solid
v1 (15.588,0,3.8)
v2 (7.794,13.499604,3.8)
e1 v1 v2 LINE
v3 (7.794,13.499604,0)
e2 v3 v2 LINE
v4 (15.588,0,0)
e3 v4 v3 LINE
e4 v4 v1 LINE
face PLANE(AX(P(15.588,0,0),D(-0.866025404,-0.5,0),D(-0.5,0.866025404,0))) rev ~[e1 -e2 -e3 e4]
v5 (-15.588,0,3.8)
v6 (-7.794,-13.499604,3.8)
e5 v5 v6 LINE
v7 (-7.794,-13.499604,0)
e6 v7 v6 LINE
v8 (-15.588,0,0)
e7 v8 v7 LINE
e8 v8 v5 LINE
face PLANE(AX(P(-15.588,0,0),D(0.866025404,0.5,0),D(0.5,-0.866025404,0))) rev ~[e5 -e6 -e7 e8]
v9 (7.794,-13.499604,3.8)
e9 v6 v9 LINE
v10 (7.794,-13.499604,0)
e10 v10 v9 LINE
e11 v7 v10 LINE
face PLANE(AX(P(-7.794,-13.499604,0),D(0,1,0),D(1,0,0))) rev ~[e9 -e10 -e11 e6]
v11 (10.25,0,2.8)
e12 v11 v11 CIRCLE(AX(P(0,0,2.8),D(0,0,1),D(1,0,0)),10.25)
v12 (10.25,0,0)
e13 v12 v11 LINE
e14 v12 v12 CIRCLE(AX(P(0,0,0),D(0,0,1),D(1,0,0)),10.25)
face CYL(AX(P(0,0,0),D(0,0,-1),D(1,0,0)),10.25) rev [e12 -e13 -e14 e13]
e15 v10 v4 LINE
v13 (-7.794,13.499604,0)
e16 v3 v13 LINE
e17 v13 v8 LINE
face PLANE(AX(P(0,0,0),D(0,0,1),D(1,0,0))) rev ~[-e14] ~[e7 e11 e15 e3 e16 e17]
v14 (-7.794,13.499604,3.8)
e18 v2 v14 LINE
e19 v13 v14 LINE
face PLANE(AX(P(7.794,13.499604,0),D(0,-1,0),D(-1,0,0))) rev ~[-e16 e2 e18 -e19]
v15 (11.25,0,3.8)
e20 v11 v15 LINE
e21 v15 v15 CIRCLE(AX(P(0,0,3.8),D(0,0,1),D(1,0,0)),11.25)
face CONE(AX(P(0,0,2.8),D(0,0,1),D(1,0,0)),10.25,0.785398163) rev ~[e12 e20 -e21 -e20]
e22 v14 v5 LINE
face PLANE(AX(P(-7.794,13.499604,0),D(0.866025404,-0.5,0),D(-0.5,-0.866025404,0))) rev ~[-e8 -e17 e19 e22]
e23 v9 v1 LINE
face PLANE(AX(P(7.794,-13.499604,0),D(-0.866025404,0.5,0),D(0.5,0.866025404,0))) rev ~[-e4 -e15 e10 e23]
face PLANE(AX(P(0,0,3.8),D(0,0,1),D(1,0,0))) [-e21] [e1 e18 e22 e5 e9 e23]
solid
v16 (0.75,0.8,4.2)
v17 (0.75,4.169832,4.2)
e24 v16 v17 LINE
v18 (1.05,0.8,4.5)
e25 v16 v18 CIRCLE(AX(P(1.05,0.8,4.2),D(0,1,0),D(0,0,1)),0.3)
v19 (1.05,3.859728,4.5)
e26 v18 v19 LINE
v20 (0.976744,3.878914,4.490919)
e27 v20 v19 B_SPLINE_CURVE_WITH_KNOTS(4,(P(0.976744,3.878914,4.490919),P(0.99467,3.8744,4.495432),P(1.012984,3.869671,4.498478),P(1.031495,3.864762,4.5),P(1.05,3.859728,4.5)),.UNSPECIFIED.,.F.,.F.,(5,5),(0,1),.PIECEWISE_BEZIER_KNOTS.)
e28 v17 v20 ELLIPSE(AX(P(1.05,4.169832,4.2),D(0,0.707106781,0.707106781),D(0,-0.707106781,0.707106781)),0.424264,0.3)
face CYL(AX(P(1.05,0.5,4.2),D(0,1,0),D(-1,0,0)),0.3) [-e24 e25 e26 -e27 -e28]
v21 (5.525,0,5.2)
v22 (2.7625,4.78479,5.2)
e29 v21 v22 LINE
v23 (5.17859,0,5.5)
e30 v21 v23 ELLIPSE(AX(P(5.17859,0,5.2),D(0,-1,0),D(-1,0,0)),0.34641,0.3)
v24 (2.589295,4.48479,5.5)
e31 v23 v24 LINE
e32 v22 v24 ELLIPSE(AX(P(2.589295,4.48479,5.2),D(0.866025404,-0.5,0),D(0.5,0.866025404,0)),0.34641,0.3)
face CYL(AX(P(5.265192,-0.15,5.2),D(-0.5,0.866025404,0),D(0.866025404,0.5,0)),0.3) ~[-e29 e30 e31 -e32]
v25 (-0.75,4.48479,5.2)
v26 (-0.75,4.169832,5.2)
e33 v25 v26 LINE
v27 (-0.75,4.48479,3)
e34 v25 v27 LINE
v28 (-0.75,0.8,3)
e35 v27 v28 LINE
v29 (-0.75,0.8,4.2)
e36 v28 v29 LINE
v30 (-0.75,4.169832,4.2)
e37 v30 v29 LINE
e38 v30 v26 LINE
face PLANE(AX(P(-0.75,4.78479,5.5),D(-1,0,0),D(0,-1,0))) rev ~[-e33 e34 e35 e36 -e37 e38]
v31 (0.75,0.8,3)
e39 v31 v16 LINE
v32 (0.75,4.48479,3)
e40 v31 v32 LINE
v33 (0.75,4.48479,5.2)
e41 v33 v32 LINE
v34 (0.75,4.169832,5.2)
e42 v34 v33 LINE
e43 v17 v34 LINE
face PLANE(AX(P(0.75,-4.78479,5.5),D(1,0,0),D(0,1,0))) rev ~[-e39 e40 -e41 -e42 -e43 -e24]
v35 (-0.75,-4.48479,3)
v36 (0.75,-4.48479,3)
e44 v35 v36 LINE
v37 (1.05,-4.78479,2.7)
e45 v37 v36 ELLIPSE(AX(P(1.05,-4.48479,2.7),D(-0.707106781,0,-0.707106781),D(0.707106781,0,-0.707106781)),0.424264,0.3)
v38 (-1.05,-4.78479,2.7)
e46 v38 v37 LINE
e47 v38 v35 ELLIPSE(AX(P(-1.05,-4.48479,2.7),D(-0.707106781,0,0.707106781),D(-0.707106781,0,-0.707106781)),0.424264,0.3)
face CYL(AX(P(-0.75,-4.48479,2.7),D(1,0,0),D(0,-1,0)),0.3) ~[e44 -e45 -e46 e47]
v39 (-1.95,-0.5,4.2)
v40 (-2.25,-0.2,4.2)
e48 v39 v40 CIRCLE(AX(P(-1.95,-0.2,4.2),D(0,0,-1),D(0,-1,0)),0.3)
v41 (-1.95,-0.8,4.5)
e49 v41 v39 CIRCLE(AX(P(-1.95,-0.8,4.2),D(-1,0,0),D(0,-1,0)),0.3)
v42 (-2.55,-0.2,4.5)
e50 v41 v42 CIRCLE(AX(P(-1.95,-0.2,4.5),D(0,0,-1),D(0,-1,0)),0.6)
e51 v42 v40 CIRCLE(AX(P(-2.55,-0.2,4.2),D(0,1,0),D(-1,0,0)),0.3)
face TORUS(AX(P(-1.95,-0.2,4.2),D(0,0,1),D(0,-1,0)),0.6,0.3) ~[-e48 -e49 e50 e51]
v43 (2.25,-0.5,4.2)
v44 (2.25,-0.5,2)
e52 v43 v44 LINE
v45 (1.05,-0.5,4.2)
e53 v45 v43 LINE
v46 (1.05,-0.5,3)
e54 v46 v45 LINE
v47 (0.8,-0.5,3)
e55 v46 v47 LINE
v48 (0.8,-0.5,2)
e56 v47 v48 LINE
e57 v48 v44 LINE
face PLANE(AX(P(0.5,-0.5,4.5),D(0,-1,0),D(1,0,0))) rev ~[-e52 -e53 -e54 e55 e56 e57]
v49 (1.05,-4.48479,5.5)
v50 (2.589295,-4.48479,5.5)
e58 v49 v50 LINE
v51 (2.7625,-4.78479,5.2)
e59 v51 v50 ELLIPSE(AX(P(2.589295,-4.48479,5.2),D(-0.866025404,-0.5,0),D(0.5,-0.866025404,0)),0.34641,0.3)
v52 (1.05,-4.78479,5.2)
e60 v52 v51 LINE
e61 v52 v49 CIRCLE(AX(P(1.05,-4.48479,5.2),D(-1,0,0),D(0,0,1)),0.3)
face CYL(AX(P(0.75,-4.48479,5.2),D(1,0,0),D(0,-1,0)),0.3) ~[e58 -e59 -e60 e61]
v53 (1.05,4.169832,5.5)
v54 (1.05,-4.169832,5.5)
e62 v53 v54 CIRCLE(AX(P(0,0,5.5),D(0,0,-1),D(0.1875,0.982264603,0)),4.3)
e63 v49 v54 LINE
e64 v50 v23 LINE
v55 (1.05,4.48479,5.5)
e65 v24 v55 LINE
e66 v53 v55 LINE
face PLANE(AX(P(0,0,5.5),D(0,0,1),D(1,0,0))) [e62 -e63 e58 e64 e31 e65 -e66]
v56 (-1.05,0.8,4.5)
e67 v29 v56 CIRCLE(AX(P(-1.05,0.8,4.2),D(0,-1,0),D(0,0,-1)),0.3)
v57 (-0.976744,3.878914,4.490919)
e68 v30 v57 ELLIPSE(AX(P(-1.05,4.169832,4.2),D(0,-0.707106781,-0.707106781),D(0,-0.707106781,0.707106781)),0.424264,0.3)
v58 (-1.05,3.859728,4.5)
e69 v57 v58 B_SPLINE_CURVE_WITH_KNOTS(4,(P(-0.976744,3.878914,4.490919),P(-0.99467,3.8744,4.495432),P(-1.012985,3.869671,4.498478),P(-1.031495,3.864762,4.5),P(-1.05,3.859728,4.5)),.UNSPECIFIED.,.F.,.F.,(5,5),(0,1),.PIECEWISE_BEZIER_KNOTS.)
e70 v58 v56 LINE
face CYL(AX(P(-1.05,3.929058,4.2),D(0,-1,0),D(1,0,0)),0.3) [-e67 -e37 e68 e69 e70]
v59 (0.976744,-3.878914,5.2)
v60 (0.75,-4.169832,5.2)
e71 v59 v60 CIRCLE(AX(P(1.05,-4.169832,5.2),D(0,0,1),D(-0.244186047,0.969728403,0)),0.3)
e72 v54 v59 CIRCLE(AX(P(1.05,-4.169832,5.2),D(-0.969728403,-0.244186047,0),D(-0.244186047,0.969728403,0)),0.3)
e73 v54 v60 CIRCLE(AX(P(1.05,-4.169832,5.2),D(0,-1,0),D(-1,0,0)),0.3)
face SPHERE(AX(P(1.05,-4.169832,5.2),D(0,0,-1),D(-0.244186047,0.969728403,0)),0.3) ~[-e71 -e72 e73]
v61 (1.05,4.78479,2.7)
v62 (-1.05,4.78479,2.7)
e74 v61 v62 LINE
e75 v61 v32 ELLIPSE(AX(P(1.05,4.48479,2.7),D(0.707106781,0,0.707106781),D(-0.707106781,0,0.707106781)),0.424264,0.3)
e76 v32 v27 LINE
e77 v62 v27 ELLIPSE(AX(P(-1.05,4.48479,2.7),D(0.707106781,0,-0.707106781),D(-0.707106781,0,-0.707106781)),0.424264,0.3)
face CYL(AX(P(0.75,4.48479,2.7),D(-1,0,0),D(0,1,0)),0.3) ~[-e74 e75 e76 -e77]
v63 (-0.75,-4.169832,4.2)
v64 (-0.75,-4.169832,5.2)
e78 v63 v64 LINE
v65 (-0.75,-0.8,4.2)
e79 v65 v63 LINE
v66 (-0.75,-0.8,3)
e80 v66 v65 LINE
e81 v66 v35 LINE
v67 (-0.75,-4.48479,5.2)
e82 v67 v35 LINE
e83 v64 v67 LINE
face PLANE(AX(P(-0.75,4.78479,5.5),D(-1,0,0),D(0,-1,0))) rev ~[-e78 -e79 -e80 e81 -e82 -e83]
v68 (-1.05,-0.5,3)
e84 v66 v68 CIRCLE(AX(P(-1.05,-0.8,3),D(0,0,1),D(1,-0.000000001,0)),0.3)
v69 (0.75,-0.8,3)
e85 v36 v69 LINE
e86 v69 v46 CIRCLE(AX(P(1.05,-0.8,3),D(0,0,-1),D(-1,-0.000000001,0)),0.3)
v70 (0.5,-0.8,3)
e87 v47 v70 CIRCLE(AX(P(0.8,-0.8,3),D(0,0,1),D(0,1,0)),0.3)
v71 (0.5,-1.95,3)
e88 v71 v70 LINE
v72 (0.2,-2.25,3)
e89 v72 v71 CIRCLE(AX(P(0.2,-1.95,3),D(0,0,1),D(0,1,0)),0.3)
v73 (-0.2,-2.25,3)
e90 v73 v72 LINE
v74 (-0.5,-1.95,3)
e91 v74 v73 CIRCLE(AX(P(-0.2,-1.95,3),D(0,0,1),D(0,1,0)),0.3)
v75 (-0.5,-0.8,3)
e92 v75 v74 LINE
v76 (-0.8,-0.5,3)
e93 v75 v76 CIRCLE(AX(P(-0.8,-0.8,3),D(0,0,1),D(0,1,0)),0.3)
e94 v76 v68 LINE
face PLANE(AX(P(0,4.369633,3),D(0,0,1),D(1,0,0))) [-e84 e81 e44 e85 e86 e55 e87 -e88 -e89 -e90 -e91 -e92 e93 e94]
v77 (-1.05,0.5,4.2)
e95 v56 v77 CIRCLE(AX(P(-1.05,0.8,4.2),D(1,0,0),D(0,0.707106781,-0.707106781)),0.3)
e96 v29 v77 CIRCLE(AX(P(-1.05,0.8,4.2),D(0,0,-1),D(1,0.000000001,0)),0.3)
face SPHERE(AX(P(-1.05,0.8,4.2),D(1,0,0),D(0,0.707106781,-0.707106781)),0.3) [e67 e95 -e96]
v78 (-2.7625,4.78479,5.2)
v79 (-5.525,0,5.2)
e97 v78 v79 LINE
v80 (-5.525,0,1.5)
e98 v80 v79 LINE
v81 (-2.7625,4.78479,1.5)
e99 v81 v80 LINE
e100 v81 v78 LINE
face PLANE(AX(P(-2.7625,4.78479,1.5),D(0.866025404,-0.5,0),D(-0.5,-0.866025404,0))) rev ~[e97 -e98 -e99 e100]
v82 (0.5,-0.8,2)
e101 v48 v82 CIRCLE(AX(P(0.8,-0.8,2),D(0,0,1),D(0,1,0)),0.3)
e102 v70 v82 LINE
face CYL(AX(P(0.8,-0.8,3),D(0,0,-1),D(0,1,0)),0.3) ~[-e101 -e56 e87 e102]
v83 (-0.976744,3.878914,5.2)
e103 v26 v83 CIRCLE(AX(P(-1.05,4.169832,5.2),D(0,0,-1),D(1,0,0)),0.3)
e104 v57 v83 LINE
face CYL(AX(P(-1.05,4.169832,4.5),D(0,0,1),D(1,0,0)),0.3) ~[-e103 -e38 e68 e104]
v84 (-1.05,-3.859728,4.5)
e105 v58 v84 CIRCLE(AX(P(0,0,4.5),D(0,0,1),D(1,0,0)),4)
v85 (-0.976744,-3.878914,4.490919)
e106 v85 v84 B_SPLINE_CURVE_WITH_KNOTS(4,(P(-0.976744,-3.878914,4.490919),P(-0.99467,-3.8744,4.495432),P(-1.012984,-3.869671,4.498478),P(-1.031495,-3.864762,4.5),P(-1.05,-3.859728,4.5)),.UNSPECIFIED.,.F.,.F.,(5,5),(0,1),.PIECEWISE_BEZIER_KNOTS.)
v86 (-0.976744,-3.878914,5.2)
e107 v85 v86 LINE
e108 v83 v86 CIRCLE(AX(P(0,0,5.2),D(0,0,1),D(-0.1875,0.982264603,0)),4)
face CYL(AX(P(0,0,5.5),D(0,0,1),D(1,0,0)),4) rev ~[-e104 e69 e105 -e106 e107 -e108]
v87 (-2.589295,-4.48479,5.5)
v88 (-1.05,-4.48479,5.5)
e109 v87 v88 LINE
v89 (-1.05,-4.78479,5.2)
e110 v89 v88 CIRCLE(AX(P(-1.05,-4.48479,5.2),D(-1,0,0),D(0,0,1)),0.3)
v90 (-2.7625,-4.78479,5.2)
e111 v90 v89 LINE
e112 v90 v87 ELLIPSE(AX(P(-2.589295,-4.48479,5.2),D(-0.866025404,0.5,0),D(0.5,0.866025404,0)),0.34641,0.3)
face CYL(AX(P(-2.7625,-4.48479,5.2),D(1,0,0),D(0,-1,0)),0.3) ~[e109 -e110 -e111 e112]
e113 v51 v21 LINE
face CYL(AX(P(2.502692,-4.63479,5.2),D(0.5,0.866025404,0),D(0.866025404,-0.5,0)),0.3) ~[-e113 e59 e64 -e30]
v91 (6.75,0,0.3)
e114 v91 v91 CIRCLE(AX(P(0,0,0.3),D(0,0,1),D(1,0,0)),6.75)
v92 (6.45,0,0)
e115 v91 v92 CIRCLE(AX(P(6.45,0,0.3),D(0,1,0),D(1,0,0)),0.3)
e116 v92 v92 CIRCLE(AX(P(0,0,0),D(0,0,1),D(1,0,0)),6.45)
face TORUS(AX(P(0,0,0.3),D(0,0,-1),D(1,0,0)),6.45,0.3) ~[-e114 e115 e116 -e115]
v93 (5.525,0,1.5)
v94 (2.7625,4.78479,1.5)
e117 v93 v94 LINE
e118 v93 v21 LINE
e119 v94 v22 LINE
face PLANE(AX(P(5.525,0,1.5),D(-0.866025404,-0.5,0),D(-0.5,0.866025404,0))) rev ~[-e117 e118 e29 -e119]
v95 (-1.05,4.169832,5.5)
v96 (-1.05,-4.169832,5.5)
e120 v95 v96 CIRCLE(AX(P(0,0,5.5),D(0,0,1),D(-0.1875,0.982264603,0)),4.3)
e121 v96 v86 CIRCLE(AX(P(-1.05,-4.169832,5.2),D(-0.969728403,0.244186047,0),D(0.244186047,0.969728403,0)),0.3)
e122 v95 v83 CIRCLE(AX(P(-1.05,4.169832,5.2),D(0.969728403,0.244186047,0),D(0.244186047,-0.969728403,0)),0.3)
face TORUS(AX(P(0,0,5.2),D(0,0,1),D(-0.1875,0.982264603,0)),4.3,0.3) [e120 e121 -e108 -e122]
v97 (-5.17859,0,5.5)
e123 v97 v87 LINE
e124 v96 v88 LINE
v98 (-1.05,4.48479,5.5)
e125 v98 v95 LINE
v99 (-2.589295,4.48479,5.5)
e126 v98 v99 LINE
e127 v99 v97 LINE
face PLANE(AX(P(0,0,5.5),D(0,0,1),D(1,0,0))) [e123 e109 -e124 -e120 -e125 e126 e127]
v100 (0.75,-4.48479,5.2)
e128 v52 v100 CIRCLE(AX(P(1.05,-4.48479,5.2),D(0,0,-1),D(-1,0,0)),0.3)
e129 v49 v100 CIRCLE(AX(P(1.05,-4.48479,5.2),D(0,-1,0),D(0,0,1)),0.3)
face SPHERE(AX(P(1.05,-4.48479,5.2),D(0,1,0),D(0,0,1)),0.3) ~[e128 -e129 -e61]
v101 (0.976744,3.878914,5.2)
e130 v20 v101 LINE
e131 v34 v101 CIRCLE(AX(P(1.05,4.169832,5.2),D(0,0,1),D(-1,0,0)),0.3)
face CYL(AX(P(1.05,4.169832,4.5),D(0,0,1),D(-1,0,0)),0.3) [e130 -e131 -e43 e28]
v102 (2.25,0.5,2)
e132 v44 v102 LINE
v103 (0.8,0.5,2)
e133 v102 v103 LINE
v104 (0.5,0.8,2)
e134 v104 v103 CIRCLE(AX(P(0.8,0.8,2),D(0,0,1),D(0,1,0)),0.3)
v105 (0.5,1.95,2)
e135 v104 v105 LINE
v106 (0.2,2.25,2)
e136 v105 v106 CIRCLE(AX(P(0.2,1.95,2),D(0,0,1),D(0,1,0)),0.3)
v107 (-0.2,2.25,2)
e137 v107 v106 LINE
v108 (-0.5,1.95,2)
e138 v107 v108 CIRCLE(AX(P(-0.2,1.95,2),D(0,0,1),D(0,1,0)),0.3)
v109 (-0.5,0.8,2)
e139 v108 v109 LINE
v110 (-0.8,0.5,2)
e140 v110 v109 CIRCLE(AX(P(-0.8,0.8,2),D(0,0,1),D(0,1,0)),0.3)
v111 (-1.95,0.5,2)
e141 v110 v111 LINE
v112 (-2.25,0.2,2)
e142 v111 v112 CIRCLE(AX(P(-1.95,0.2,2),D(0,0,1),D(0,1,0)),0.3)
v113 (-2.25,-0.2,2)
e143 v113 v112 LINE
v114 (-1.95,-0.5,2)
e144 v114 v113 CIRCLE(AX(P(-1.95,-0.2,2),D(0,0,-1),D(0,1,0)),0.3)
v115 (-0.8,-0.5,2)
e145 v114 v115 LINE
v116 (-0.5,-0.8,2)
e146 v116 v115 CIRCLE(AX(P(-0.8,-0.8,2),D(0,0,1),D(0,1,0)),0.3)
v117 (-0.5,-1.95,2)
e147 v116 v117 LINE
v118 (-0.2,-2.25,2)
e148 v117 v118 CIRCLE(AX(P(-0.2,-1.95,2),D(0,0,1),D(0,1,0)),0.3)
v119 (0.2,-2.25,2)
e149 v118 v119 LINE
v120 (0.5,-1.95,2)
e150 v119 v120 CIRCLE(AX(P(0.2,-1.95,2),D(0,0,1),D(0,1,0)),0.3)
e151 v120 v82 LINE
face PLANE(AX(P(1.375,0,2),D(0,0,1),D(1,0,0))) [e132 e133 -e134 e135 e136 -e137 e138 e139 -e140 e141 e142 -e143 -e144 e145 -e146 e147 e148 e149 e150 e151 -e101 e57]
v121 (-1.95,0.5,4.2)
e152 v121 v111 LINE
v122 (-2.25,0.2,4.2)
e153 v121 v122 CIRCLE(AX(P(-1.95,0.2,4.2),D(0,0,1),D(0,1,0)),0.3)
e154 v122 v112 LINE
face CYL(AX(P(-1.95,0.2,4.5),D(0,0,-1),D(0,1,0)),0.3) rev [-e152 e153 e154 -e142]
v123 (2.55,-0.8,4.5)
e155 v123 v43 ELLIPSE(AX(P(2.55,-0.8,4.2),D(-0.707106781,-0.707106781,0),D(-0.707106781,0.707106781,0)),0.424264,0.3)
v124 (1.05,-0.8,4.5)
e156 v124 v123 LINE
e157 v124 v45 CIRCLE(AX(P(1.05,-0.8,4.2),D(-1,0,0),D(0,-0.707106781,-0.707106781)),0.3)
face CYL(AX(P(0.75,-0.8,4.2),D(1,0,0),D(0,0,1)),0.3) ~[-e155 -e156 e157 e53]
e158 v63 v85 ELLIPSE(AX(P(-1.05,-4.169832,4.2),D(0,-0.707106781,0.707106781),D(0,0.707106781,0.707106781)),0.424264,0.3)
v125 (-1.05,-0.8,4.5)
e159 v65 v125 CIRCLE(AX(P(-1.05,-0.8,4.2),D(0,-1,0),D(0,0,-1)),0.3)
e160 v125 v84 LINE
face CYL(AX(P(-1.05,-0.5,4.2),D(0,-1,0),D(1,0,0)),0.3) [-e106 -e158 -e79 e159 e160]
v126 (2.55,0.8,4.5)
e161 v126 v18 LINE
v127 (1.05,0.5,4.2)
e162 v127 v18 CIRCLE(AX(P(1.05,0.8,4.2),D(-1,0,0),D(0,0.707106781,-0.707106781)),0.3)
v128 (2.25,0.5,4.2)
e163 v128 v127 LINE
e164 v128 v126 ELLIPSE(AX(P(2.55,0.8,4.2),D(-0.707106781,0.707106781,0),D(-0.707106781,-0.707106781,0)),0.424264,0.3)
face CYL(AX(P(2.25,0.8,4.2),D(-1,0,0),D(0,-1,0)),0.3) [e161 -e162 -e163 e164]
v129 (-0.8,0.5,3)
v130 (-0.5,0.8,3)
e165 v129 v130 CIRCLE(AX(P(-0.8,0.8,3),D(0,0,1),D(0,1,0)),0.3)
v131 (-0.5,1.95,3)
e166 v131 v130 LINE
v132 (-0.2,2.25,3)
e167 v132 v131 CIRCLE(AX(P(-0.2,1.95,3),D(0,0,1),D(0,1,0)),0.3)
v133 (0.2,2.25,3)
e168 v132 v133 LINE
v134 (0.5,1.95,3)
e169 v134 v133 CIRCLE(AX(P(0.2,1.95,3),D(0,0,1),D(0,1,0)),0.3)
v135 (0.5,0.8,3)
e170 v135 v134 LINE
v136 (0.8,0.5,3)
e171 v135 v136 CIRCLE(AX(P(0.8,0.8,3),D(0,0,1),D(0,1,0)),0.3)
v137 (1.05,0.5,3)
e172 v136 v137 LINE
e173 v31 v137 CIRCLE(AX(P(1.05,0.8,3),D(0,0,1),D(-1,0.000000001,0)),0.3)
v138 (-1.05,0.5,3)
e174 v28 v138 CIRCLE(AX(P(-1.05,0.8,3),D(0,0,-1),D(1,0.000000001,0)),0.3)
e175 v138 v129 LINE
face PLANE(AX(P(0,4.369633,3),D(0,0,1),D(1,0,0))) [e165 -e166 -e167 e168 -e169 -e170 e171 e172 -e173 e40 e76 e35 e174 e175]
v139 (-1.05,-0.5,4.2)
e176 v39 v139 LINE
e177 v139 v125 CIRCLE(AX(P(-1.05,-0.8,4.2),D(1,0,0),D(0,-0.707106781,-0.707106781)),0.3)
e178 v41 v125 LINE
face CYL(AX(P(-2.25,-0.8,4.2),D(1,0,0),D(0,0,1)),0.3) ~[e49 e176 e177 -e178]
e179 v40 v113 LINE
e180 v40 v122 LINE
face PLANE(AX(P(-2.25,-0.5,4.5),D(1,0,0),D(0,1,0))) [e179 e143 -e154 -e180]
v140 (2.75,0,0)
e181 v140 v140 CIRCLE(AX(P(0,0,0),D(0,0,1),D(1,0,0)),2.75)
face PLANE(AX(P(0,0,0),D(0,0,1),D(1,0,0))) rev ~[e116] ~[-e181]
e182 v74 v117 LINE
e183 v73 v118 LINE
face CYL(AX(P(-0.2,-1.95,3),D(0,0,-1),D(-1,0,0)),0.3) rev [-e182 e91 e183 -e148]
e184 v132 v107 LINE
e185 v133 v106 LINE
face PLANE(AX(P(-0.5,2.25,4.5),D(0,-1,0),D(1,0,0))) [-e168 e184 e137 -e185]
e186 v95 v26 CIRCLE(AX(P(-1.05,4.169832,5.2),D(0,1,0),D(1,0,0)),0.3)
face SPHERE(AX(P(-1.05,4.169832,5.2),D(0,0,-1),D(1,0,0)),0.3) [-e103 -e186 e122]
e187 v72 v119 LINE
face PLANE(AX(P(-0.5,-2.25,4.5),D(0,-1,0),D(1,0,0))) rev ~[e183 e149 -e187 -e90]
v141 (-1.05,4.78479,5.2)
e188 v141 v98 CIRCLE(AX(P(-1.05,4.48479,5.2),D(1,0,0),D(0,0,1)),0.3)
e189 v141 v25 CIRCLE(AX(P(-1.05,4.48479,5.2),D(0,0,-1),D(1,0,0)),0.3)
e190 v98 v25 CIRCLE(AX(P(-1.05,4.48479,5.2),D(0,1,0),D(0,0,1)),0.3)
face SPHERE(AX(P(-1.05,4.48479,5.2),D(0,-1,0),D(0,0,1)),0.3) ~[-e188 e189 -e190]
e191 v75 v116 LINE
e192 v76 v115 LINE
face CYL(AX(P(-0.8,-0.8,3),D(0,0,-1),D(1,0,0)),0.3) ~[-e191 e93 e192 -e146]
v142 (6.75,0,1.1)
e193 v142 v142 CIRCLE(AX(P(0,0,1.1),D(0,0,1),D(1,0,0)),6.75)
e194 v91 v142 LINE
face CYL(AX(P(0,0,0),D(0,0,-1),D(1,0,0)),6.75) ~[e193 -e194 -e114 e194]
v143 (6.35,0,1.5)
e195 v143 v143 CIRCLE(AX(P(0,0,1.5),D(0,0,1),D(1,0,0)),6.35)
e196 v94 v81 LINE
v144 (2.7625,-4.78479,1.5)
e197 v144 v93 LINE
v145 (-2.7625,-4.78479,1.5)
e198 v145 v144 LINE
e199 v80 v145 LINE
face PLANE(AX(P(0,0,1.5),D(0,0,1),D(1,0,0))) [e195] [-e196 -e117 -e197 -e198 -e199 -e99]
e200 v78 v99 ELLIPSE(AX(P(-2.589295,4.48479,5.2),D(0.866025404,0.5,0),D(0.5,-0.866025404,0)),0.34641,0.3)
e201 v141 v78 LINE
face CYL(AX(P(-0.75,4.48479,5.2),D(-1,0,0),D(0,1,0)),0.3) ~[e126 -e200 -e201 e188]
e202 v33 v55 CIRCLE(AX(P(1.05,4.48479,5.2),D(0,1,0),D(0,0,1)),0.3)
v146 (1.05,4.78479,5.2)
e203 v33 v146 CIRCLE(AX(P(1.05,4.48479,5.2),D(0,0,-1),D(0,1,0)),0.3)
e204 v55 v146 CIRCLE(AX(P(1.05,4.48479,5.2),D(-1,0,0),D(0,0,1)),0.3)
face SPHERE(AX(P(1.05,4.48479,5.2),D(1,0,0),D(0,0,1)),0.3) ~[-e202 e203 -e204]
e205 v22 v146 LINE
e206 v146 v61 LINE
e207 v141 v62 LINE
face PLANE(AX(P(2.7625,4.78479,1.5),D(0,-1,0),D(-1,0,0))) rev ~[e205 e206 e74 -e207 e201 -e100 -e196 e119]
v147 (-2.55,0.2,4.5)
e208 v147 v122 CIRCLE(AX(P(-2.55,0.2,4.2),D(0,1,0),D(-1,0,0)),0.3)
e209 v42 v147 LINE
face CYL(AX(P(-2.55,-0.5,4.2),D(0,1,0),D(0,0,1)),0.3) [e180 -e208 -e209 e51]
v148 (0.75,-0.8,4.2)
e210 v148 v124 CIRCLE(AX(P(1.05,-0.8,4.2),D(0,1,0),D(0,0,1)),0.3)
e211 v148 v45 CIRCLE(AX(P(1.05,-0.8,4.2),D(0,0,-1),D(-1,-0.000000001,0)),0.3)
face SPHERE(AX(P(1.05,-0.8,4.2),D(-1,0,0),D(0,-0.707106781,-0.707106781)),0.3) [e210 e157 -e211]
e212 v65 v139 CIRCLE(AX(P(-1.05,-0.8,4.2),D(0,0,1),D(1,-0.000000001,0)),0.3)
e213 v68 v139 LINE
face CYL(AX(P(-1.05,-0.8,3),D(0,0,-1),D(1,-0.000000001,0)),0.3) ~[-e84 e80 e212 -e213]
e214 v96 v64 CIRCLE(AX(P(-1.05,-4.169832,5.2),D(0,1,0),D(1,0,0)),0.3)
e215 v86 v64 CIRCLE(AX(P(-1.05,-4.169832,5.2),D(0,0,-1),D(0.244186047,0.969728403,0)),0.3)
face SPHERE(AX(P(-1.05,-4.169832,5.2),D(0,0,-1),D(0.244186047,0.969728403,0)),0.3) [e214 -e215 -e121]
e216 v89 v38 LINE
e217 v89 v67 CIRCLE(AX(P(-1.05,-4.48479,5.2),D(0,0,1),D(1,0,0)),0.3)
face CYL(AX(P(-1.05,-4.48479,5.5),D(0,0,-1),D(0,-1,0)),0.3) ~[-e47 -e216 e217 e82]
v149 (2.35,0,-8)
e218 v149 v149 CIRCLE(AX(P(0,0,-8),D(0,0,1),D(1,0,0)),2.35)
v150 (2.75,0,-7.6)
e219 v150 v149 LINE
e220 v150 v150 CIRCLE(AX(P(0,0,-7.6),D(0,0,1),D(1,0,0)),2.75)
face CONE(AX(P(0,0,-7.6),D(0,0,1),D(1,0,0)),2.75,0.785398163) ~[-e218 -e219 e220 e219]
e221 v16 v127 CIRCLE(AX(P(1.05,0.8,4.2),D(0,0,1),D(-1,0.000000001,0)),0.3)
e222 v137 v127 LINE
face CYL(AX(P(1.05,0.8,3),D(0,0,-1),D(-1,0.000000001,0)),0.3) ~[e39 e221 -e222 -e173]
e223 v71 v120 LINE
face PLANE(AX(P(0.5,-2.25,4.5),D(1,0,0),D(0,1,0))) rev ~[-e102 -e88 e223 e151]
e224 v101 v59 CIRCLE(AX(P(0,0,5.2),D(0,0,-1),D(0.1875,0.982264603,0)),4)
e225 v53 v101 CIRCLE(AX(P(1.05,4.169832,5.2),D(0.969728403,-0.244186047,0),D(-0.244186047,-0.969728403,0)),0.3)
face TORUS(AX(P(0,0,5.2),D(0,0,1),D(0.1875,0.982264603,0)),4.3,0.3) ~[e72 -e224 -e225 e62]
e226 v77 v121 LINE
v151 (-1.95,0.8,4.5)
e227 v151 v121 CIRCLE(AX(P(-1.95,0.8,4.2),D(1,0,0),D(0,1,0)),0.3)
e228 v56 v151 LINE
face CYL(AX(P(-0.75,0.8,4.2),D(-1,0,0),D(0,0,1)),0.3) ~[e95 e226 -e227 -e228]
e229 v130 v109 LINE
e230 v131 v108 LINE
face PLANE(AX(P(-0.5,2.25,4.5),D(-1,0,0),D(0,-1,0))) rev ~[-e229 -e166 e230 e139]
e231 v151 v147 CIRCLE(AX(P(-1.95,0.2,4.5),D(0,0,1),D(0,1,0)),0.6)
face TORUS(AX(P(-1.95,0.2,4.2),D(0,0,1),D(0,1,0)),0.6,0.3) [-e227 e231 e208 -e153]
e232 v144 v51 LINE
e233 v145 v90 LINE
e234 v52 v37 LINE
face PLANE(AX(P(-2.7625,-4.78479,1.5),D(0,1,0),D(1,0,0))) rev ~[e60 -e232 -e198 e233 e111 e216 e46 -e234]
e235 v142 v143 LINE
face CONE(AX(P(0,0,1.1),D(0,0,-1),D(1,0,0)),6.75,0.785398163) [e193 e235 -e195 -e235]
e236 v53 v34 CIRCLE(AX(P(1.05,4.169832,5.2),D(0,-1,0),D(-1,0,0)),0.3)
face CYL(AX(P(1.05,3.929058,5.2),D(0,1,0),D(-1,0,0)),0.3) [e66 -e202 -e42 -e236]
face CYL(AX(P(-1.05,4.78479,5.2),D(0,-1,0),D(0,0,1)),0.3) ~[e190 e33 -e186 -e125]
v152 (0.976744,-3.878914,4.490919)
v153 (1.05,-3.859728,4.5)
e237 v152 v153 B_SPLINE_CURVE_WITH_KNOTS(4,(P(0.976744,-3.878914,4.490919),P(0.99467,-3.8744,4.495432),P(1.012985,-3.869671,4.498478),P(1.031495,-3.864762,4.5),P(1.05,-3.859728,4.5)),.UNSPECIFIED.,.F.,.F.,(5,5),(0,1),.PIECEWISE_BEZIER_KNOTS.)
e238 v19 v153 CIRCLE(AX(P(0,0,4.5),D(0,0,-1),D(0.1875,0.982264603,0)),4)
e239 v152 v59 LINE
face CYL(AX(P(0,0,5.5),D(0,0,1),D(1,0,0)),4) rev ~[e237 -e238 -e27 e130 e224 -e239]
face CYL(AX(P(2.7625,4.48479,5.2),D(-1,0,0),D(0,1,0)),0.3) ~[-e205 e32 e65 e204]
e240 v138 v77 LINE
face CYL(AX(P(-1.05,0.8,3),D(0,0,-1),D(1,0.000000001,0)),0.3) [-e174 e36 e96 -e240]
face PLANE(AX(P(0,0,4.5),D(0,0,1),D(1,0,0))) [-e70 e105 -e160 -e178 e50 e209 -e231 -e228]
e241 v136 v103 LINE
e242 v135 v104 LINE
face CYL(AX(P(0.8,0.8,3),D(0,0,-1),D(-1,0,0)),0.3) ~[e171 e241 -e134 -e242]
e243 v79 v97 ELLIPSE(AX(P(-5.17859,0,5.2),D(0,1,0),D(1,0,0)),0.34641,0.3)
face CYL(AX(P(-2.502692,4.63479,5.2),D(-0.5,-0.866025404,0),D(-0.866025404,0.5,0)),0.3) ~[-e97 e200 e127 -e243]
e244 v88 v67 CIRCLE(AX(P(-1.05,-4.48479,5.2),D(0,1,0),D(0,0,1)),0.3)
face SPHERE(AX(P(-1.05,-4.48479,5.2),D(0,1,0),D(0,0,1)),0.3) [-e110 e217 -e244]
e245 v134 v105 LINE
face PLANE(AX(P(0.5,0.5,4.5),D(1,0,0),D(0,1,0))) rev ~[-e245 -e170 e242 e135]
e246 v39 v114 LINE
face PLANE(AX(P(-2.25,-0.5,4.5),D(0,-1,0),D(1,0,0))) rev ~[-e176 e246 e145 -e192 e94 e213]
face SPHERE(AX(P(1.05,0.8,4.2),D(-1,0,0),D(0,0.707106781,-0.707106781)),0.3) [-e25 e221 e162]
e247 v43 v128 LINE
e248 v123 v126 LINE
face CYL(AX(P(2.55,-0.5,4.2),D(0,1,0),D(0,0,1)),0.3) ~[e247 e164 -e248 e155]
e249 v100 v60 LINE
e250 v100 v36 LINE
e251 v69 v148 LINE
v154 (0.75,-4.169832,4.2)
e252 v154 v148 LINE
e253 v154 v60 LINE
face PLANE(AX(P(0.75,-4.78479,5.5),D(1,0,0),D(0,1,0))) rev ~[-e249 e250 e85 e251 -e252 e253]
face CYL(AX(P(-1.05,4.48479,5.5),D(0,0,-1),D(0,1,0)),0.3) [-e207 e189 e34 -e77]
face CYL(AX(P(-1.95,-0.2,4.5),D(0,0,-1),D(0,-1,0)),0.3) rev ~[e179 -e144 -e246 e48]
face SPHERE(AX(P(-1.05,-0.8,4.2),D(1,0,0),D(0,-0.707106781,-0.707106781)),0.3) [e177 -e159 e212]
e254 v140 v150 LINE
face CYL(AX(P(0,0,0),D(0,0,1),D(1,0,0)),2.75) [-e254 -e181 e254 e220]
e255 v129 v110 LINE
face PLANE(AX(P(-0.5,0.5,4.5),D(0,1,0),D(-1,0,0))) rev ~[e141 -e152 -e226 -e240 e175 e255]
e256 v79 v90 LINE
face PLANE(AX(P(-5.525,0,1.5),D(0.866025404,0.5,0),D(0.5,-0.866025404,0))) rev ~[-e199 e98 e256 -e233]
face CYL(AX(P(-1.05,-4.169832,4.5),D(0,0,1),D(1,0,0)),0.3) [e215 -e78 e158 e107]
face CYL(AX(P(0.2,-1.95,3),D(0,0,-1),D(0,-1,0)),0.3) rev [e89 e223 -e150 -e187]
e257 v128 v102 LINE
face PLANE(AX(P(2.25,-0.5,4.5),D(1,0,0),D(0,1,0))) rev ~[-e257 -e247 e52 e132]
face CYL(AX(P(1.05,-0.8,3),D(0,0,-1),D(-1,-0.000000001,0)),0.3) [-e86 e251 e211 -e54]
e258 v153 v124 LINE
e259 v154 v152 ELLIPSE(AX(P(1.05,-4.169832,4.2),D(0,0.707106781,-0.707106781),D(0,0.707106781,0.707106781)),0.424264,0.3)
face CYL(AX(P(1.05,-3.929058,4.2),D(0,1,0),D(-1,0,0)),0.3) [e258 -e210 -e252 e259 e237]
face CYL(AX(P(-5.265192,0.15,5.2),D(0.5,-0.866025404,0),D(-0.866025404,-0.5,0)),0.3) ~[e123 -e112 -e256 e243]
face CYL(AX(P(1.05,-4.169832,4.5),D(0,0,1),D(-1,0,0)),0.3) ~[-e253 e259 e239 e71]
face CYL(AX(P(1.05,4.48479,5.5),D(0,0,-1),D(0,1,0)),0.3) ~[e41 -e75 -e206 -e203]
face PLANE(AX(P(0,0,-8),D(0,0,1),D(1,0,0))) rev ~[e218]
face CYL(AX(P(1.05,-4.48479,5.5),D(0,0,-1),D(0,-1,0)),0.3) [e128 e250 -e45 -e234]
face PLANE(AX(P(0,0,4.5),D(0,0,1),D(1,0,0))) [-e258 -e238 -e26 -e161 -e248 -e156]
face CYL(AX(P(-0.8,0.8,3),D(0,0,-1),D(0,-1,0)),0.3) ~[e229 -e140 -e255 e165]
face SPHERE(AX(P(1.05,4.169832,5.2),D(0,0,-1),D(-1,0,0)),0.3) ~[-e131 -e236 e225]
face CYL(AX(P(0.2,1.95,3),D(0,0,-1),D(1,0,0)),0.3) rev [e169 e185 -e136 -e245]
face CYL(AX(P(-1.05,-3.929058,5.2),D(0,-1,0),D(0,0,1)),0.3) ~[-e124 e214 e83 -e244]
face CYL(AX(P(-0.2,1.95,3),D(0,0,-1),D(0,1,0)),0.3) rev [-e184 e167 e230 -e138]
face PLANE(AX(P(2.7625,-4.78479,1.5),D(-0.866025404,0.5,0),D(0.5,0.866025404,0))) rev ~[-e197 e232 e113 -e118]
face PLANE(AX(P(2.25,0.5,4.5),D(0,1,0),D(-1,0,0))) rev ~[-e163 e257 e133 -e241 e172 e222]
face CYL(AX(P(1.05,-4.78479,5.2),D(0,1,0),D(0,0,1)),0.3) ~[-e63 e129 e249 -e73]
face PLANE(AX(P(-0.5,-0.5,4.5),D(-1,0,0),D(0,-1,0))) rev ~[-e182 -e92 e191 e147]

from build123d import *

# Parameters (mm, degrees)
F0_R          = 10.25
F1_DEPTH      = 3.8
F2_SIZE       = 1
F3_R          = 2.75
F4_DEPTH      = 8
F3_R_2        = 6.75
F5_DEPTH      = 1.5
F7_DEPTH      = 4
F8_R          = 4
F9_DEPTH      = 1
F11_DEPTH     = 2.5
F12_W         = 1.75
F12_H         = 1
F12_W_2       = 1
F12_H_2       = 1.75
F12_W_3       = 1.5
F12_W_4       = 0.25
F13_DEPTH     = 2.5
F14_R         = 0.3
F15_T1_DEPTH  = 1.2
F15_S5_W      = 0.3
F15_S5_H      = 0.3
F15_T6_DEPTH  = 0.3
F15_S11_W     = 0.3
F15_S11_H     = 0.3
F15_T12_DEPTH = 0.3
F15_S17_W     = 0.3
F15_S17_H     = 0.3
F15_T18_DEPTH = 0.3
F15_S23_W     = 0.3
F15_S23_H     = 0.3
F15_T24_DEPTH = 0.3
F16_R         = 0.3
F17_SIZE      = 0.4


# Not quite as in the source:
# - a fillet or chamfer that OpenCascade refuses, or shapes differently, is made with other operations: its cross-section is extruded or revolved along the edge and cut away or added


with BuildPart() as f1:
    # F0 (on Top) → F1 (new body)
    with BuildSketch(Plane.XY):
        Polygon((7.794, 13.4996039942), (-7.794, 13.4996039942), (-15.588, 0), (-7.794, -13.4996039942), (7.794, -13.4996039942), (15.588, 0), align=None)
        Circle(F0_R, mode=Mode.SUBTRACT)
    extrude(amount=F1_DEPTH)

    # F2
    f2_edges = [f1.edges().sort_by_distance(p)[0] for p in [
        (-10.25, 0, 3.8),
    ]]
    chamfer(f2_edges, length=F2_SIZE)


with BuildPart() as f4:
    # F3 (on Top) → F4 (new body)
    with BuildSketch(Plane.XY):
        Circle(F3_R)
    extrude(amount=-F4_DEPTH)

    # F3 (on Top) → F5 (join)
    with BuildSketch(Plane.XY):
        Circle(F3_R_2)
        Circle(F3_R, mode=Mode.SUBTRACT)
        Circle(F3_R)
    extrude(amount=F5_DEPTH)

    # F6 (on face) → F7 (join)
    with BuildSketch(Plane.XY.offset(1.5)):
        Polygon((2.7625, 4.7847903559), (-2.7625, 4.7847903559), (-5.525, 0), (-2.7625, -4.7847903559), (2.7625, -4.7847903559), (5.525, 0), align=None)
    extrude(amount=F7_DEPTH)

    # F8 (on face) → F9 (cut)
    with BuildSketch(Plane.XY.offset(5.5)):
        Circle(F8_R)
    extrude(amount=-F9_DEPTH, mode=Mode.SUBTRACT)

    # F10 (on face) → F11 (cut)
    with BuildSketch(Plane.XY.offset(5.5)):
        with BuildLine():
            Line((0.75, 4.7847903559), (-0.75, 4.7847903559))
            Line((-0.75, 4.7847903559), (-0.75, 3.9290584114))
            ThreePointArc((-0.75, 3.9290584114), (0, 4), (0.75, 3.9290584114))
            Line((0.75, 3.9290584114), (0.75, 4.7847903559))
        make_face()
        with BuildLine():
            ThreePointArc((0.75, 3.9290584114), (0, 4), (-0.75, 3.9290584114))
            Line((-0.75, 3.9290584114), (-0.75, -3.9290584114))
            ThreePointArc((-0.75, -3.9290584114), (0, -4), (0.75, -3.9290584114))
            Line((0.75, -3.9290584114), (0.75, 3.9290584114))
        make_face()
        with BuildLine():
            ThreePointArc((0.75, -3.9290584114), (0, -4), (-0.75, -3.9290584114))
            Line((-0.75, -3.9290584114), (-0.75, -4.7847903559))
            Line((-0.75, -4.7847903559), (0.75, -4.7847903559))
            Line((0.75, -4.7847903559), (0.75, -3.9290584114))
        make_face()
    extrude(amount=-F11_DEPTH, mode=Mode.SUBTRACT)

    # F12 (on face) → F13 (cut)
    with BuildSketch(Plane.XY.offset(4.5)):
        with Locations((1.375, 0)):
            Rectangle(F12_W, F12_H)
        Rectangle(F12_W_2, F12_H)
        with Locations((0, 1.375)):
            Rectangle(F12_W_2, F12_H_2)
        with Locations((0, -1.375)):
            Rectangle(F12_W_2, F12_H_2)
        with Locations((-1.5, 0)):
            Rectangle(F12_W_3, F12_H)
        with Locations((-0.625, 0)):
            Rectangle(F12_W_4, F12_H)
    extrude(amount=-F13_DEPTH, mode=Mode.SUBTRACT)

    # F14
    f14_edges = [f4.edges().sort_by_distance(p)[0] for p in [
        (-0.75, 4.356924, 5.5),
        (-4, 0, 5.5),
        (-0.75, -4.356924, 5.5),
        (-1.75625, -4.78479, 5.5),
        (-4.14375, -2.392395, 5.5),
        (-4.14375, 2.392395, 5.5),
        (-1.75625, 4.78479, 5.5),
        (4.14375, 2.392395, 5.5),
        (1.75625, 4.78479, 5.5),
        (0.75, 4.356924, 5.5),
        (4, 0, 5.5),
        (0.75, -4.356924, 5.5),
        (1.75625, -4.78479, 5.5),
        (4.14375, -2.392395, 5.5),
        (-0.75, -4.78479, 4.25),
        (0, -4.78479, 3),
        (0.75, -4.78479, 4.25),
        (-0.75, 4.78479, 4.25),
        (0, 4.78479, 3),
        (0.75, 4.78479, 4.25),
        (0.75, -2.214529, 4.5),
        (0.75, 2.214529, 4.5),
        (0.75, 3.929058, 5),
        (0.75, -3.929058, 5),
        (1.5, 0.5, 4.5),
        (2.25, 0, 4.5),
        (1.5, -0.5, 4.5),
        (-0.75, -3.929058, 5),
        (-0.75, 3.929058, 5),
        (-0.75, -2.214529, 4.5),
        (-1.5, -0.5, 4.5),
        (-1.5, 0.5, 4.5),
        (-2.25, 0, 4.5),
        (-0.75, 2.214529, 4.5),
        (-0.5, 2.25, 2.5),
        (0.5, 2.25, 2.5),
        (0.5, -2.25, 2.5),
        (-0.5, -2.25, 2.5),
        (-2.25, -0.5, 3.25),
        (-2.25, 0.5, 3.25),
    ]]
    fillet(f14_edges, radius=F14_R)

    # F15: fillet of radius 0.3 on 4 edges, made by hand

    # F15_s2 → F15_t1 (cut)
    with BuildSketch(Plane.XY.offset(3)):
        with BuildLine():
            ThreePointArc((0.75, -0.8), (0.8378679656, -0.5878679656), (1.05, -0.5))
            Line((1.05, -0.5), (0.75, -0.5))
            Line((0.75, -0.5), (0.75, -0.8))
        make_face()
        with BuildLine():
            ThreePointArc((0.75, 0.8), (0.8378679656, 0.5878679656), (1.05, 0.5))
            Line((1.05, 0.5), (0.75, 0.5))
            Line((0.75, 0.5), (0.75, 0.8))
        make_face()
        with BuildLine():
            ThreePointArc((-0.75, 0.8), (-0.8378679656, 0.5878679656), (-1.05, 0.5))
            Line((-1.05, 0.5), (-0.75, 0.5))
            Line((-0.75, 0.5), (-0.75, 0.8))
        make_face()
        with BuildLine():
            ThreePointArc((-0.75, -0.8), (-0.8378679656, -0.5878679656), (-1.05, -0.5))
            Line((-1.05, -0.5), (-0.75, -0.5))
            Line((-0.75, -0.5), (-0.75, -0.8))
        make_face()
    extrude(amount=F15_T1_DEPTH, mode=Mode.SUBTRACT)


with BuildPart() as f15_tool4:
    # F15_s5 → F15_t6 (new body)
    with BuildSketch(Plane.YZ.offset(-1.05)):
        with Locations((-0.65, 4.35)):
            Rectangle(F15_S5_W, F15_S5_H)
    extrude(amount=F15_T6_DEPTH)

    # F15_s7 → F15_t8 (revolve, cut)
    with BuildSketch(Plane(origin=(-1.05, -0.8, 4.2), x_dir=(0, -0.7071067812, -0.7071067812), z_dir=(0, -0.7071067812, 0.7071067812))):
        with BuildLine():
            ThreePointArc((0, -0.3), (0.3, 0), (0, 0.3))
            Line((0, 0.3), (0, -0.3))
        make_face()
    revolve(axis=Axis((-1.05, -0.8, 4.2), (1, 0, 0)), mode=Mode.SUBTRACT)


with BuildPart() as f4_1:
    add(f4.part)

    # F15_t3: cut F15_tool4
    add(f15_tool4.part, mode=Mode.SUBTRACT)


with BuildPart() as f15_tool10:
    # F15_s11 → F15_t12 (new body)
    with BuildSketch(Plane.YZ.offset(-1.05)):
        with Locations((0.65, 4.35)):
            Rectangle(F15_S11_W, F15_S11_H)
    extrude(amount=F15_T12_DEPTH)

    # F15_s13 → F15_t14 (revolve, cut)
    with BuildSketch(Plane(origin=(-1.05, 0.8, 4.2), x_dir=(0, 0.7071067812, -0.7071067812), z_dir=(0, -0.7071067812, -0.7071067812))):
        with BuildLine():
            ThreePointArc((0, -0.3), (0.3, 0), (0, 0.3))
            Line((0, 0.3), (0, -0.3))
        make_face()
    revolve(axis=Axis((-1.05, 0.8, 4.2), (1, 0, 0)), mode=Mode.SUBTRACT)


with BuildPart() as f4_2:
    add(f4_1.part)

    # F15_t9: cut F15_tool10
    add(f15_tool10.part, mode=Mode.SUBTRACT)


with BuildPart() as f15_tool16:
    # F15_s17 → F15_t18 (new body)
    with BuildSketch(Plane.YZ.offset(1.05)):
        with Locations((0.65, 4.35)):
            Rectangle(F15_S17_W, F15_S17_H)
    extrude(amount=-F15_T18_DEPTH)

    # F15_s19 → F15_t20 (revolve, cut)
    with BuildSketch(Plane(origin=(1.05, 0.8, 4.2), x_dir=(0, 0.7071067812, -0.7071067812), z_dir=(0, 0.7071067812, 0.7071067812))):
        with BuildLine():
            ThreePointArc((0, -0.3), (0.3, 0), (0, 0.3))
            Line((0, 0.3), (0, -0.3))
        make_face()
    revolve(axis=Axis((1.05, 0.8, 4.2), (-1, 0, 0)), mode=Mode.SUBTRACT)


with BuildPart() as f4_3:
    add(f4_2.part)

    # F15_t15: cut F15_tool16
    add(f15_tool16.part, mode=Mode.SUBTRACT)


with BuildPart() as f15_tool22:
    # F15_s23 → F15_t24 (new body)
    with BuildSketch(Plane.YZ.offset(1.05)):
        with Locations((-0.65, 4.35)):
            Rectangle(F15_S23_W, F15_S23_H)
    extrude(amount=-F15_T24_DEPTH)

    # F15_s25 → F15_t26 (revolve, cut)
    with BuildSketch(Plane(origin=(1.05, -0.8, 4.2), x_dir=(0, -0.7071067812, -0.7071067812), z_dir=(0, 0.7071067812, -0.7071067812))):
        with BuildLine():
            ThreePointArc((0, -0.3), (0.3, 0), (0, 0.3))
            Line((0, 0.3), (0, -0.3))
        make_face()
    revolve(axis=Axis((1.05, -0.8, 4.2), (-1, 0, 0)), mode=Mode.SUBTRACT)


with BuildPart() as f4_4:
    add(f4_3.part)

    # F15_t21: cut F15_tool22
    add(f15_tool22.part, mode=Mode.SUBTRACT)

    # F16
    f16_edges = [f4_4.edges().sort_by_distance(p)[0] for p in [
        (0.5, 0.5, 2.5),
        (-0.5, 0.5, 2.5),
        (-0.5, -0.5, 2.5),
        (0.5, -0.5, 2.5),
        (-6.75, 0, 0),
    ]]
    fillet(f16_edges, radius=F16_R)

    # F17
    f17_edges = [f4_4.edges().sort_by_distance(p)[0] for p in [
        (-6.75, 0, 1.5),
        (-2.75, 0, -8),
    ]]
    chamfer(f17_edges, length=F17_SIZE)


solid = Compound([f1.part, f4_4.part])
